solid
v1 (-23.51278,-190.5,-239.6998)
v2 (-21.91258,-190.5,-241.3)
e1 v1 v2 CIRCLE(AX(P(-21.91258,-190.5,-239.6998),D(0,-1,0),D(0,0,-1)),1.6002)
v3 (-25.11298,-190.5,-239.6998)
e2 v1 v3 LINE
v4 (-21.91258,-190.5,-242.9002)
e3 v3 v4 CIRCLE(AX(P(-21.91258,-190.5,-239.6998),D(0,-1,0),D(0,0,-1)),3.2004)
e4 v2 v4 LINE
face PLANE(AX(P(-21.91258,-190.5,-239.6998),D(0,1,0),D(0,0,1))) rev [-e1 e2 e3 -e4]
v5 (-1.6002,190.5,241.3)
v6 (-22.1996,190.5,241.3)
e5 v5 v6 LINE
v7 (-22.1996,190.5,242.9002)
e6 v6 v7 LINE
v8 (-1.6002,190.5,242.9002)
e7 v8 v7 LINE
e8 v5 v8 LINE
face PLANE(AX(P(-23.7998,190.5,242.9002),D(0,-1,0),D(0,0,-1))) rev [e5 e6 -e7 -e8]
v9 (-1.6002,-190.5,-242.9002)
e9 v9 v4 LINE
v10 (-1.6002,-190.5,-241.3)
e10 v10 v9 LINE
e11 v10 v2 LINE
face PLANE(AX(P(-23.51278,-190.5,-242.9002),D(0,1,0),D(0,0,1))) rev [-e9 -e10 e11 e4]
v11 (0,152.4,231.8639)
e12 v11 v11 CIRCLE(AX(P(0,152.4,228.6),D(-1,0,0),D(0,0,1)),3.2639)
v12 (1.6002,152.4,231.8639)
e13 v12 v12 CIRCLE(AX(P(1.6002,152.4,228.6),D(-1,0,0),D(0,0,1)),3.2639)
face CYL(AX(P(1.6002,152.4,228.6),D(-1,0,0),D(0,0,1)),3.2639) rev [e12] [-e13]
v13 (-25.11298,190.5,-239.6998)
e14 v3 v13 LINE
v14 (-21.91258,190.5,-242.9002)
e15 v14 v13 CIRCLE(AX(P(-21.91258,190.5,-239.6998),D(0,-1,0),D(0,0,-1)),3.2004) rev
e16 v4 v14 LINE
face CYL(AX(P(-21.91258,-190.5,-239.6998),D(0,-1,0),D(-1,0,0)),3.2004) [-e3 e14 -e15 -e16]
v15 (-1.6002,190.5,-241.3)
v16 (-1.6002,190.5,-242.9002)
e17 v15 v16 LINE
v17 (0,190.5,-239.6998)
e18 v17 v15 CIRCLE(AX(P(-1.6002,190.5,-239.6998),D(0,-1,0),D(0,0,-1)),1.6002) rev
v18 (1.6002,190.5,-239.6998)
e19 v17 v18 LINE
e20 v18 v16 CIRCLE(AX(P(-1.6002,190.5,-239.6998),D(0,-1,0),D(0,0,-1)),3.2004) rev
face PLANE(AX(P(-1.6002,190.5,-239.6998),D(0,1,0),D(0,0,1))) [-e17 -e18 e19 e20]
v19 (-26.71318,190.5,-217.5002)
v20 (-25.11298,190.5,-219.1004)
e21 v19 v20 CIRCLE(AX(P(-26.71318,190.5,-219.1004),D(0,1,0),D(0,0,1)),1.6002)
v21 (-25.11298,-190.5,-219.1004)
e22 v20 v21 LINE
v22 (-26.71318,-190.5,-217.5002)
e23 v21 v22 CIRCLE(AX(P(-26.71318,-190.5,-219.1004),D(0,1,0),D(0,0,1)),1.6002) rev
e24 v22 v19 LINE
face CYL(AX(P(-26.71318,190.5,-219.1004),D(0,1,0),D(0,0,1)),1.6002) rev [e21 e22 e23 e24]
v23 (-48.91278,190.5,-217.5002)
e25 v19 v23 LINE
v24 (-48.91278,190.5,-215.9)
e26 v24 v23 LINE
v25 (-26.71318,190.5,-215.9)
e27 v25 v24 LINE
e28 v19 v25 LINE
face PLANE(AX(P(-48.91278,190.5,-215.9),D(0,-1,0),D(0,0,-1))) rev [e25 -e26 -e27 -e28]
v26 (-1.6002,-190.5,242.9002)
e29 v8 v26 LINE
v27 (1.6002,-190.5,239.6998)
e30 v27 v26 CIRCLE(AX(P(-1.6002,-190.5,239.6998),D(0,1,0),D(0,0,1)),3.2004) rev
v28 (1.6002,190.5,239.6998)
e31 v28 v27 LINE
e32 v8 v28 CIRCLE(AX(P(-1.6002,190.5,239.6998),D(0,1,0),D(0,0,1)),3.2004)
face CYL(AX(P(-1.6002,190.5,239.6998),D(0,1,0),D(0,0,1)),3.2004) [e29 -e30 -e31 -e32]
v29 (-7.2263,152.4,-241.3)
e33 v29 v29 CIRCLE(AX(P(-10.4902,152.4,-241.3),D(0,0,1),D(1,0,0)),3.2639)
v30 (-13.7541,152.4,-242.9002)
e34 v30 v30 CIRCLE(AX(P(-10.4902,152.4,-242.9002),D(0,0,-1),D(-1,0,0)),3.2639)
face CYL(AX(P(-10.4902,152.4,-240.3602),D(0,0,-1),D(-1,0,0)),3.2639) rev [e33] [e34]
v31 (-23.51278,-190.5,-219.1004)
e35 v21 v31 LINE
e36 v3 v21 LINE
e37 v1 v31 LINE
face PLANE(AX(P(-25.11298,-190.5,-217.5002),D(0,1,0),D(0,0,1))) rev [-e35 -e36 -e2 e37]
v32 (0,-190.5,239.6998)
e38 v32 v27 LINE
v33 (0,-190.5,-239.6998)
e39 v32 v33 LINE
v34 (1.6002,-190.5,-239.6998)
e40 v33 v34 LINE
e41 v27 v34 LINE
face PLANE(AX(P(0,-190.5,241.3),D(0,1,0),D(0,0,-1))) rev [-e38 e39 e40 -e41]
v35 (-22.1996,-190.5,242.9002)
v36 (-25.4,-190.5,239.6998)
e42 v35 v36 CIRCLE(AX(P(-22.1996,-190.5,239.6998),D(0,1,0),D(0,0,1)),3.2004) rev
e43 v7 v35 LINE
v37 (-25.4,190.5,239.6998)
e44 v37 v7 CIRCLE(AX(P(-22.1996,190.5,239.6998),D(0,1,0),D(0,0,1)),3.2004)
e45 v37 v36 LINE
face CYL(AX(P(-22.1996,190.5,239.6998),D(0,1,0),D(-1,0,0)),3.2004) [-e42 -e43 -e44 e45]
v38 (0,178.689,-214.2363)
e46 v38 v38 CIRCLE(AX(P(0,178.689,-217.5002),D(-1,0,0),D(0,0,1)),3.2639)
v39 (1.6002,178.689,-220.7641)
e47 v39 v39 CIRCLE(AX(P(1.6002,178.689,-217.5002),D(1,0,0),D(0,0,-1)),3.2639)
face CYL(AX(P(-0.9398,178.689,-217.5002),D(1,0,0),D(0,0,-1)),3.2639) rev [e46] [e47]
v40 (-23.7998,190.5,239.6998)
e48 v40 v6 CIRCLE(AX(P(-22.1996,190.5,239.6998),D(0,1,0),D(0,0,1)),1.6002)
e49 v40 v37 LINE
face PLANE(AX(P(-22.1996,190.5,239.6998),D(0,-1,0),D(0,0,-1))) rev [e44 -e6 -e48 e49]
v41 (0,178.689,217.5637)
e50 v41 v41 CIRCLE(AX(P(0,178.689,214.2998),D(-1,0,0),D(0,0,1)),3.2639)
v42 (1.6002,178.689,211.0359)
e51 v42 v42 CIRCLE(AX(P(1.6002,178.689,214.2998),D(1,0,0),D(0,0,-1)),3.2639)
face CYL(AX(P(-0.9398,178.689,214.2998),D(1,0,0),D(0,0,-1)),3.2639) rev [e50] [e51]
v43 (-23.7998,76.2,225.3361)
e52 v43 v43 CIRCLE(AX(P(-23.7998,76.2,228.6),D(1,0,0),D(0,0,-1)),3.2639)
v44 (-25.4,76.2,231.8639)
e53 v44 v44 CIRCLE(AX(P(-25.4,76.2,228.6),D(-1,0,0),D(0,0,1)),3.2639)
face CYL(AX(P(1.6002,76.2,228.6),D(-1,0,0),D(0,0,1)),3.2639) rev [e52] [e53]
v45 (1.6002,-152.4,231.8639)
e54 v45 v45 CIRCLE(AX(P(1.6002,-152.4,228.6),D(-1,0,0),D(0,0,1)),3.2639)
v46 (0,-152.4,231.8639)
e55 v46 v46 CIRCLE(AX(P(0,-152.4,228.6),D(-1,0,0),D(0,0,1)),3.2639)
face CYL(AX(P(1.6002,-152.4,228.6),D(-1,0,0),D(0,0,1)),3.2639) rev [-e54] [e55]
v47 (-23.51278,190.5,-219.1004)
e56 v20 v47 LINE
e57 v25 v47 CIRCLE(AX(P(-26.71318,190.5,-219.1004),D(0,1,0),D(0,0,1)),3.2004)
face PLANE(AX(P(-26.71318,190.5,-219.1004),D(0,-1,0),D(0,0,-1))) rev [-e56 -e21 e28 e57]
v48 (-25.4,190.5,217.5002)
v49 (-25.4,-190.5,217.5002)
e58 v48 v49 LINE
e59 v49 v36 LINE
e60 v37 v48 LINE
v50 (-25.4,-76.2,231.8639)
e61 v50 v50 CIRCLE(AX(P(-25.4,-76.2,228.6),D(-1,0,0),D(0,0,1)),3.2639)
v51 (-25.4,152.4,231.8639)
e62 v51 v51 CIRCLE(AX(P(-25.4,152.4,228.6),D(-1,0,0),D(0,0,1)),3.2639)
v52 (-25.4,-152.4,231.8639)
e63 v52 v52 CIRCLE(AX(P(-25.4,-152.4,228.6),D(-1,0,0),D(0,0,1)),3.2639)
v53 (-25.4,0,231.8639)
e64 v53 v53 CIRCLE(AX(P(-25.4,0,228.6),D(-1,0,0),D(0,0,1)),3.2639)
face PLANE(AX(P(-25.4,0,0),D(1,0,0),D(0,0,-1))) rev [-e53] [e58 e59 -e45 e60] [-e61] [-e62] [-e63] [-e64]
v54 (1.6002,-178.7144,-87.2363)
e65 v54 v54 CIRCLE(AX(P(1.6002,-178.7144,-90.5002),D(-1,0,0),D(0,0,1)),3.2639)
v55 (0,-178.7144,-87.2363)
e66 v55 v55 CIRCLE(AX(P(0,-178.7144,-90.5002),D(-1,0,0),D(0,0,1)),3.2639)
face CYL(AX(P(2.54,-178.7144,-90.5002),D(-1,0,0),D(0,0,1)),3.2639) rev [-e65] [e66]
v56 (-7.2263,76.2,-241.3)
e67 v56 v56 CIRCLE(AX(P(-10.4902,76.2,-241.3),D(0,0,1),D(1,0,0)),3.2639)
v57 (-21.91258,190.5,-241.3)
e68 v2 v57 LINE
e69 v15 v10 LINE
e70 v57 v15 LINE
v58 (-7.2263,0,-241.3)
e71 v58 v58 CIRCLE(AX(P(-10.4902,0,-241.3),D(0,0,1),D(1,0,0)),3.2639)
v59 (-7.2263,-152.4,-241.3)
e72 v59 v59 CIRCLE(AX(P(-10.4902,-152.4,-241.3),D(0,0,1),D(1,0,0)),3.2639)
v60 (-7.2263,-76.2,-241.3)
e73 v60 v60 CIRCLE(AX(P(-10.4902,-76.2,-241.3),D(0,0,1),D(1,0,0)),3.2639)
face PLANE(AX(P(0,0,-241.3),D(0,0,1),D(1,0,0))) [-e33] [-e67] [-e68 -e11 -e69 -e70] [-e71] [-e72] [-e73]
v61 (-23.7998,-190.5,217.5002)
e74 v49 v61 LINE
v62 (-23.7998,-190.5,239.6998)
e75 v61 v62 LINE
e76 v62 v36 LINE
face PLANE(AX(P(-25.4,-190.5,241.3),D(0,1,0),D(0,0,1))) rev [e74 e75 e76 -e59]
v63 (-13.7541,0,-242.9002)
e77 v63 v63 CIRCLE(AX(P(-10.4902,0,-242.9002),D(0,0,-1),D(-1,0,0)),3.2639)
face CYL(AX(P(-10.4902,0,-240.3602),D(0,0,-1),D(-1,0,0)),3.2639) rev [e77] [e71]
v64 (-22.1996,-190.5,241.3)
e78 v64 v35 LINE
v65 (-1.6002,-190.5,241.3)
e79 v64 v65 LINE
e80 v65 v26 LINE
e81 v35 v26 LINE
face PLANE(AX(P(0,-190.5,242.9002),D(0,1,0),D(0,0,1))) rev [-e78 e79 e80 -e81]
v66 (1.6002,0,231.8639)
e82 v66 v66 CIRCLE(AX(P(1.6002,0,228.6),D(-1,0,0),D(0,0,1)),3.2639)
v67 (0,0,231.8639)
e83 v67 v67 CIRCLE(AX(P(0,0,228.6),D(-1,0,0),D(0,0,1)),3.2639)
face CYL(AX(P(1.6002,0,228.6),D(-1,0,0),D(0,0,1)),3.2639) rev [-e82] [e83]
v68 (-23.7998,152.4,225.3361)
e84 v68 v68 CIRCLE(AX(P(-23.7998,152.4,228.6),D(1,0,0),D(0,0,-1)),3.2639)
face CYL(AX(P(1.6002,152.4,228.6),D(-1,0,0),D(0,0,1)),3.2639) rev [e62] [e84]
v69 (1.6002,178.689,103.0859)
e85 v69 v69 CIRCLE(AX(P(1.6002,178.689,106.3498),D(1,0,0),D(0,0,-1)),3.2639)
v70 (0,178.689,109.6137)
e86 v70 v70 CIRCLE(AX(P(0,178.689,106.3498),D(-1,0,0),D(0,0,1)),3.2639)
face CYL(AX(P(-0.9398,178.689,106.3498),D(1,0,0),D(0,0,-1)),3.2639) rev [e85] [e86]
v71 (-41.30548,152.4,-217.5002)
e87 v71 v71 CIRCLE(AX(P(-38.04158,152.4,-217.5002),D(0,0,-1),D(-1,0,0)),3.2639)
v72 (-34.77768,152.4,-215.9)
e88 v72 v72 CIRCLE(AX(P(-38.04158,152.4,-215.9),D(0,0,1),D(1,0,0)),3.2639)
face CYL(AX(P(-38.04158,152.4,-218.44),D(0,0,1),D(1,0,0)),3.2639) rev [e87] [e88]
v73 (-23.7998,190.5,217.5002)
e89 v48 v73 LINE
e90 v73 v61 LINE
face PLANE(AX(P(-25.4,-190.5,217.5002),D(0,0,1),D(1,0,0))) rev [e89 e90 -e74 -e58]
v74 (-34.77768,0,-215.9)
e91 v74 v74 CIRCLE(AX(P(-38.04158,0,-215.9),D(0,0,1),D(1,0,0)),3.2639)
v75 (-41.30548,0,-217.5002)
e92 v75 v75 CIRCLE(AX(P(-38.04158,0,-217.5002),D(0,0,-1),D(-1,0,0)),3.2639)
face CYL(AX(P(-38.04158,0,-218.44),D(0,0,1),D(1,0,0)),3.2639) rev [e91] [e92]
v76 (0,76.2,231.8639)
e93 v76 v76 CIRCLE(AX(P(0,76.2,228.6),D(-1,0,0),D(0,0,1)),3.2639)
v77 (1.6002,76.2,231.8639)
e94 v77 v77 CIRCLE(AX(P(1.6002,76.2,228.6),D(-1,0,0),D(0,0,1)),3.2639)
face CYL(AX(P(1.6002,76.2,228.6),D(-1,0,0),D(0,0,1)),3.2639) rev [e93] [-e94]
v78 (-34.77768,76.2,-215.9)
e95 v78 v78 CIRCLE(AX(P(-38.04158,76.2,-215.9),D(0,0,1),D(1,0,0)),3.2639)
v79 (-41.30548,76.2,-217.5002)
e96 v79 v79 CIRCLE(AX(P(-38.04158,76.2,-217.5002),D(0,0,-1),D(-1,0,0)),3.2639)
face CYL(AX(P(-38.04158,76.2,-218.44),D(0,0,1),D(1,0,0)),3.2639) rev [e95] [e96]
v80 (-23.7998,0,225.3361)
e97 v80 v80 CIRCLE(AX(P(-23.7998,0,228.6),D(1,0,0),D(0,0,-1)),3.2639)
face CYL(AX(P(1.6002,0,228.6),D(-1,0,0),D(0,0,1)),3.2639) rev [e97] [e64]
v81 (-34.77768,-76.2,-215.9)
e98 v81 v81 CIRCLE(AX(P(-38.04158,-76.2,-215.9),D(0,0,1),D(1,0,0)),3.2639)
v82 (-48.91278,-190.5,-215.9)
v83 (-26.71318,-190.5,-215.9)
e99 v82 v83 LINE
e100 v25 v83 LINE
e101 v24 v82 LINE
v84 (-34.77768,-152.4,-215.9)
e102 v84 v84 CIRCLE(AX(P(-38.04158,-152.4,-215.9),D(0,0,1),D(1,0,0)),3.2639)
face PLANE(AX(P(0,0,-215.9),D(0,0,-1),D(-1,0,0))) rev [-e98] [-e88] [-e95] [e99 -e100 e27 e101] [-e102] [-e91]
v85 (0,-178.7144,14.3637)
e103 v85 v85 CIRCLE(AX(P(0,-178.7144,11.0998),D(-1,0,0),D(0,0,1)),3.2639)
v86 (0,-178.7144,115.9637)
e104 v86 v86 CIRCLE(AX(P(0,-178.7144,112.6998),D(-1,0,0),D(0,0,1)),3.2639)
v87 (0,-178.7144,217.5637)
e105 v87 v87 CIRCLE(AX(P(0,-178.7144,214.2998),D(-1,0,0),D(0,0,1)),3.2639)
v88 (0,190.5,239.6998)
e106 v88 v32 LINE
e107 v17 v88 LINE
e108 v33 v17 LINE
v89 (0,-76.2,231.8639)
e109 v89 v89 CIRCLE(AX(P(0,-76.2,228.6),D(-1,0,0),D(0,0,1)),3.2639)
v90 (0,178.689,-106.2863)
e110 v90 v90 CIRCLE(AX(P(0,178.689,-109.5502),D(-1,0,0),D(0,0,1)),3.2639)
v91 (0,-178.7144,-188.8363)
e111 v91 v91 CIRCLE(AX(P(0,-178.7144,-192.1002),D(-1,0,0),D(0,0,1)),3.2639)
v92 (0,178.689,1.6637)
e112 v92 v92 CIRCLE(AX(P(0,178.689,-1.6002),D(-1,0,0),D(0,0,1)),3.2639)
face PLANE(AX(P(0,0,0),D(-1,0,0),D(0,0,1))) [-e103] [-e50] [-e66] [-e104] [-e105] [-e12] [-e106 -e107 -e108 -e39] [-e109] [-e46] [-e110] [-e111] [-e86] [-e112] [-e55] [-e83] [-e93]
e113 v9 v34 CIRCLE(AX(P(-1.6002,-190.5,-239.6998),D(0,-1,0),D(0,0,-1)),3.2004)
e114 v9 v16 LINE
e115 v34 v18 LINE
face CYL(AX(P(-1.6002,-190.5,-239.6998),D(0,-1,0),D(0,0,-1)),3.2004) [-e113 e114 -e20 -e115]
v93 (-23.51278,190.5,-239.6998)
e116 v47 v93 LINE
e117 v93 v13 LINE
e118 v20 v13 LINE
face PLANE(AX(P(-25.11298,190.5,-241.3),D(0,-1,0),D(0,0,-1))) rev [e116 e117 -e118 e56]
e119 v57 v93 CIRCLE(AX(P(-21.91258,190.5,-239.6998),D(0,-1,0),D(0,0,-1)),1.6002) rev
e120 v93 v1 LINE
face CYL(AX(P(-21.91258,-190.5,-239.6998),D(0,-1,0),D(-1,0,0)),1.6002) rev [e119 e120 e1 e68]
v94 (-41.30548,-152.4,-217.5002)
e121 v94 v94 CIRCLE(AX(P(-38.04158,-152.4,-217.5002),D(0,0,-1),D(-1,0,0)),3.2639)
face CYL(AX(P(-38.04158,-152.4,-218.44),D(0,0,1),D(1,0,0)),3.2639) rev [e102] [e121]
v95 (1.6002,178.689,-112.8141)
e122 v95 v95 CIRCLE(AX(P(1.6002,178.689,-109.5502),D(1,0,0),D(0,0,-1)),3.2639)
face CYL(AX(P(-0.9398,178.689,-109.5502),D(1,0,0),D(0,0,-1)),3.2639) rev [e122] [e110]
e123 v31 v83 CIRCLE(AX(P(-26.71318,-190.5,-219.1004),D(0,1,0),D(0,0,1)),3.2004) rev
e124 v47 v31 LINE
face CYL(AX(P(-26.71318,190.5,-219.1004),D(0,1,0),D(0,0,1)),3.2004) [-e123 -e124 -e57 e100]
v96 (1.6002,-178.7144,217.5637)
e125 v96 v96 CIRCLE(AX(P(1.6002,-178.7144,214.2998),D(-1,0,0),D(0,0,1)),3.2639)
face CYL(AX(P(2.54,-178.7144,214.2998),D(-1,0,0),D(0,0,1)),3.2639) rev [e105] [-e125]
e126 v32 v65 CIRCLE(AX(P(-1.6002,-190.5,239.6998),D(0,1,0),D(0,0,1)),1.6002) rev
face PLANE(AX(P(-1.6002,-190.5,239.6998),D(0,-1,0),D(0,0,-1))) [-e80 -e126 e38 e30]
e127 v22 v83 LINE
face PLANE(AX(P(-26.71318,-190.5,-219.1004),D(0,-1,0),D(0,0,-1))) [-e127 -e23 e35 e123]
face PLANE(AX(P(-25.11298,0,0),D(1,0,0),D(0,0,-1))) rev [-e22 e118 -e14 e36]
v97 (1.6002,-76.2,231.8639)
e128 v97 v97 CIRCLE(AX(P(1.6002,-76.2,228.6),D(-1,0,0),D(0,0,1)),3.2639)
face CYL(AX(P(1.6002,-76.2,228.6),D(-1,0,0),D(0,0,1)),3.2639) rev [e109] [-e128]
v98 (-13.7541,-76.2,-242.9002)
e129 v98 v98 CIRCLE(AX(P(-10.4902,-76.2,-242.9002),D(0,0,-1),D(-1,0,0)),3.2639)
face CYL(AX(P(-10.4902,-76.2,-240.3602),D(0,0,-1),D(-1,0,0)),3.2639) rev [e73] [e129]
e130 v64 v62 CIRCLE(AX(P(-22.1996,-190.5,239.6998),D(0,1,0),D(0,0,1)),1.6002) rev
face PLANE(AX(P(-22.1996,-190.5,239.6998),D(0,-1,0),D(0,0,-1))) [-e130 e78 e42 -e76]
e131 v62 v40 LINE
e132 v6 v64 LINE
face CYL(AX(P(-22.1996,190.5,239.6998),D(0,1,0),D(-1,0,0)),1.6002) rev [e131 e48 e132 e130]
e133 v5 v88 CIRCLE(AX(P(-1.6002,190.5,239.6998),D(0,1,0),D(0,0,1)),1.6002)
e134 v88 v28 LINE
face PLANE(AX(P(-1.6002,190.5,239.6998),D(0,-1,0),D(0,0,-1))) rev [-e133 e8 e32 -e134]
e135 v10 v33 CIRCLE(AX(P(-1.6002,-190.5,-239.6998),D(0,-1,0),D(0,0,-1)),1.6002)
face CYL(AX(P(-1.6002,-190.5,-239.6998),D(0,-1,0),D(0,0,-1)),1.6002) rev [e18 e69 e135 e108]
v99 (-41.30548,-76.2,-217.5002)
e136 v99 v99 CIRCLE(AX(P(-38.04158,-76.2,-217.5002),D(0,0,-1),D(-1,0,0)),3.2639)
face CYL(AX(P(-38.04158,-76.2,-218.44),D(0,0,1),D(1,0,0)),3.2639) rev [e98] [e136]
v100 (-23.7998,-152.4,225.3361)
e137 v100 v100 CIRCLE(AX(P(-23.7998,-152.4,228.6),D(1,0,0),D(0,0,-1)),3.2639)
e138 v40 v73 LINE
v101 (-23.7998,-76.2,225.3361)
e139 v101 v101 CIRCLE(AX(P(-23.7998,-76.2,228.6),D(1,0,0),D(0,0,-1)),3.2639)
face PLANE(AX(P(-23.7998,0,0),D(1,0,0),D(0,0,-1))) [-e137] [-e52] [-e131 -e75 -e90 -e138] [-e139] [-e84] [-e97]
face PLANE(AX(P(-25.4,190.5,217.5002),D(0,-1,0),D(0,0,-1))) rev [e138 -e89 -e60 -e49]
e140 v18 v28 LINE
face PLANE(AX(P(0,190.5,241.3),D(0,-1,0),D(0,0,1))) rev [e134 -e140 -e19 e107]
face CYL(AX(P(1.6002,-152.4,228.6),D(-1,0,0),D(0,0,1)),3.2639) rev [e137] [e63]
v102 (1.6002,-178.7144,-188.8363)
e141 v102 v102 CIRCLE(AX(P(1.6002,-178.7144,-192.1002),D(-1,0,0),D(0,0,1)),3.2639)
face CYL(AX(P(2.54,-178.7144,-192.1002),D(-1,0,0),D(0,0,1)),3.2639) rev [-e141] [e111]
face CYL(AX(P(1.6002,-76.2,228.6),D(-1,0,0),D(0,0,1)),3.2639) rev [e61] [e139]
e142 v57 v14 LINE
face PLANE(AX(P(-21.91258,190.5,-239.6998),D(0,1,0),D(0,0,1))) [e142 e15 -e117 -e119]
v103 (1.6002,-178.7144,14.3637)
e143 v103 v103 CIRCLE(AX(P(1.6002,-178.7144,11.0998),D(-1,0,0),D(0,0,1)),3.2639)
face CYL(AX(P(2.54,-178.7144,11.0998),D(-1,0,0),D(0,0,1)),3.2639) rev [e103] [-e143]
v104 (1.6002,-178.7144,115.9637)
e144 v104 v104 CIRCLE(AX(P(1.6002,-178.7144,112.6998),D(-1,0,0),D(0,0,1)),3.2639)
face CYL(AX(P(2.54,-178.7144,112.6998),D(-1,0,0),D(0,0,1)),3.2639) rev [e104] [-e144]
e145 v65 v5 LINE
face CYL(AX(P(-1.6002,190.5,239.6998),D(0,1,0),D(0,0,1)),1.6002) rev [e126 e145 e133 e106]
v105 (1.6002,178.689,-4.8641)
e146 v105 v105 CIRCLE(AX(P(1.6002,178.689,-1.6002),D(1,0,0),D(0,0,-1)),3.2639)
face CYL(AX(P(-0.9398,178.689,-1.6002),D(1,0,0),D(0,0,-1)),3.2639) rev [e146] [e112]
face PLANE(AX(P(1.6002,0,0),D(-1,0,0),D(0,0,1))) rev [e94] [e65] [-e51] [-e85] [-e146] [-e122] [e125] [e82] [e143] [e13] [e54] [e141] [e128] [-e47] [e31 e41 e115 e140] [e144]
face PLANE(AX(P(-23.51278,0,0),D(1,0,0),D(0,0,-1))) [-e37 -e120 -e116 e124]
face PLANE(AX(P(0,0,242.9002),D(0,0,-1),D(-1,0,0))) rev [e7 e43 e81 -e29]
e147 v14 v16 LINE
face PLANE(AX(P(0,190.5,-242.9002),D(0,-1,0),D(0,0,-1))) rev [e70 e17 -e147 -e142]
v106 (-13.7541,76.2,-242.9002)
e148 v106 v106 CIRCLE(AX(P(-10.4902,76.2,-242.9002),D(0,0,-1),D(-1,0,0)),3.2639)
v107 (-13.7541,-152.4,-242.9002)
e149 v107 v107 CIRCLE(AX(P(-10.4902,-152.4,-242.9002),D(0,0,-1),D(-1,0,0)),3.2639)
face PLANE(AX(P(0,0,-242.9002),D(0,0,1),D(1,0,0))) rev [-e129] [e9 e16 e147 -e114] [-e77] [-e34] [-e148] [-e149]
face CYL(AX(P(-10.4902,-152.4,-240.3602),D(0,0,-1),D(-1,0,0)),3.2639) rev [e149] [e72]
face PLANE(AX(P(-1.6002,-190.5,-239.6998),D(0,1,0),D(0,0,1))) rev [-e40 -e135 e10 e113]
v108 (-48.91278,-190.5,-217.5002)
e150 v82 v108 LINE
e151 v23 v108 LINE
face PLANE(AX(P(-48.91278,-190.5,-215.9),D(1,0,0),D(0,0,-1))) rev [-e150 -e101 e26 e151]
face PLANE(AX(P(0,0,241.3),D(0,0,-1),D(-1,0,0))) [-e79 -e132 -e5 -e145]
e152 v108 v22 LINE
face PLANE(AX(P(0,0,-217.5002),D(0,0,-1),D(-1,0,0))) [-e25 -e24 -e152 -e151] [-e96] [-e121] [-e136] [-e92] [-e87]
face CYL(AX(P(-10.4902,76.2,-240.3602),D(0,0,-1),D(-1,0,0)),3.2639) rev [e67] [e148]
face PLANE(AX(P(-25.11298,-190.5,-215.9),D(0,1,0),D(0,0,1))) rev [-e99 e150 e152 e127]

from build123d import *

# Parameters (mm, degrees)
SKETCH1_W                    = 482.6
SKETCH1_H                    = 381
BOSS_EXTRUDE1_DEPTH          = 1.6002
EDGE_FLANGE1_STRIP_W         = 9.6012
EDGE_FLANGE1_STRIP_H         = 1.6002
EDGE_FLANGE1_STRIP_CUT_DEPTH = 381
EDGE_FLANGE1_DEPTH           = 381
EDGE_FLANGE2_STRIP_W         = 9.6012
EDGE_FLANGE2_STRIP_H         = 1.6002
EDGE_FLANGE2_STRIP_CUT_DEPTH = 381
EDGE_FLANGE2_DEPTH           = 381
EDGE_FLANGE3_STRIP_W         = 9.6012
EDGE_FLANGE3_STRIP_H         = 1.6002
EDGE_FLANGE3_STRIP_CUT_DEPTH = 381
EDGE_FLANGE3_DEPTH           = 381
EDGE_FLANGE4_STRIP_W         = 9.6012
EDGE_FLANGE4_STRIP_H         = 1.6002
EDGE_FLANGE4_STRIP_CUT_DEPTH = 381
EDGE_FLANGE4_DEPTH           = 381
EDGE_FLANGE5_STRIP_W         = 9.6012
EDGE_FLANGE5_STRIP_H         = 1.6002
EDGE_FLANGE5_STRIP_CUT_DEPTH = 381
EDGE_FLANGE5_DEPTH           = 381
SKETCH24_R                   = 3.2639
CUT_EXTRUDE2_DEPTH           = 2.54
SKETCH25_R                   = 3.2639
CUT_EXTRUDE3_DEPTH           = 310.870566463
SKETCH26_R                   = 3.2639
CUT_EXTRUDE4_DEPTH           = 2.54
SKETCH27_R                   = 3.2639
CUT_EXTRUDE6_DEPTH           = 2.54
SKETCH29_R                   = 3.2639
CUT_EXTRUDE7_DEPTH           = 2.54


# Sheet-metal steps are written as plain solids
with BuildPart() as part:
    # Sketch1 → Boss-Extrude1 (new body)
    with BuildSketch(Plane(origin=(0, 0, 0), x_dir=(0, 0, -1), z_dir=(1, 0, 0))):
        Rectangle(SKETCH1_W, SKETCH1_H)
    extrude(amount=BOSS_EXTRUDE1_DEPTH)

    # Edge-Flange1 strip (across the edge) → Edge-Flange1 strip cut (cut)
    with BuildSketch(Plane(origin=(0, 190.5, -241.3), x_dir=(0, 0, 1), z_dir=(0, -1, 0))):
        with Locations((-3.2004, -0.8001)):
            Rectangle(EDGE_FLANGE1_STRIP_W, EDGE_FLANGE1_STRIP_H)
    extrude(amount=EDGE_FLANGE1_STRIP_CUT_DEPTH, mode=Mode.SUBTRACT)

    # Edge-Flange1 section (across the edge) → Edge-Flange1 (add)
    with BuildSketch(Plane(origin=(0, 190.5, -241.3), x_dir=(0, 0, 1), z_dir=(0, -1, 0))):
        with BuildLine():
            Line((-1.6002, 1.6002), (-1.6002, 23.51278))
            Line((-1.6002, 23.51278), (0, 23.51278))
            Line((0, 23.51278), (0, 1.6002))
            ThreePointArc((0, 1.6002), (0.468687729, 0.468687729), (1.6002, 0))
            Line((1.6002, 0), (1.6002, -1.6002))
            ThreePointArc((1.6002, -1.6002), (-0.662824543, -0.662824543), (-1.6002, 1.6002))
        make_face()
    extrude(amount=EDGE_FLANGE1_DEPTH)

    # Edge-Flange2 strip (across the edge) → Edge-Flange2 strip cut (cut)
    with BuildSketch(Plane(origin=(-23.51278, 190.5, -241.3), x_dir=(1, 0, 0), z_dir=(0, -1, 0))):
        with Locations((-3.2004, -0.8001)):
            Rectangle(EDGE_FLANGE2_STRIP_W, EDGE_FLANGE2_STRIP_H)
    extrude(amount=EDGE_FLANGE2_STRIP_CUT_DEPTH, mode=Mode.SUBTRACT)

    # Edge-Flange2 section (across the edge) → Edge-Flange2 (add)
    with BuildSketch(Plane(origin=(-23.51278, 190.5, -241.3), x_dir=(1, 0, 0), z_dir=(0, -1, 0))):
        with BuildLine():
            Line((-1.6002, 1.6002), (-1.6002, 23.7998))
            Line((-1.6002, 23.7998), (0, 23.7998))
            Line((0, 23.7998), (0, 1.6002))
            ThreePointArc((0, 1.6002), (0.468687729, 0.468687729), (1.6002, 0))
            Line((1.6002, 0), (1.6002, -1.6002))
            ThreePointArc((1.6002, -1.6002), (-0.662824543, -0.662824543), (-1.6002, 1.6002))
        make_face()
    extrude(amount=EDGE_FLANGE2_DEPTH)

    # Edge-Flange3 strip (across the edge) → Edge-Flange3 strip cut (cut)
    with BuildSketch(Plane(origin=(-25.11298, -190.5, -217.5002), x_dir=(0, 0, -1), z_dir=(0, 1, 0))):
        with Locations((-3.2004, -0.8001)):
            Rectangle(EDGE_FLANGE3_STRIP_W, EDGE_FLANGE3_STRIP_H)
    extrude(amount=EDGE_FLANGE3_STRIP_CUT_DEPTH, mode=Mode.SUBTRACT)

    # Edge-Flange3 section (across the edge) → Edge-Flange3 (add)
    with BuildSketch(Plane(origin=(-25.11298, -190.5, -217.5002), x_dir=(0, 0, -1), z_dir=(0, 1, 0))):
        with BuildLine():
            Line((-1.6002, 1.6002), (-1.6002, 23.7998))
            Line((-1.6002, 23.7998), (0, 23.7998))
            Line((0, 23.7998), (0, 1.6002))
            ThreePointArc((0, 1.6002), (0.468687729, 0.468687729), (1.6002, 0))
            Line((1.6002, 0), (1.6002, -1.6002))
            ThreePointArc((1.6002, -1.6002), (-0.662824543, -0.662824543), (-1.6002, 1.6002))
        make_face()
    extrude(amount=EDGE_FLANGE3_DEPTH)

    # Edge-Flange4 strip (across the edge) → Edge-Flange4 strip cut (cut)
    with BuildSketch(Plane(origin=(0, -190.5, 241.3), x_dir=(0, 0, -1), z_dir=(0, 1, 0))):
        with Locations((-3.2004, -0.8001)):
            Rectangle(EDGE_FLANGE4_STRIP_W, EDGE_FLANGE4_STRIP_H)
    extrude(amount=EDGE_FLANGE4_STRIP_CUT_DEPTH, mode=Mode.SUBTRACT)

    # Edge-Flange4 section (across the edge) → Edge-Flange4 (add)
    with BuildSketch(Plane(origin=(0, -190.5, 241.3), x_dir=(0, 0, -1), z_dir=(0, 1, 0))):
        with BuildLine():
            Line((-1.6002, 1.6002), (-1.6002, 23.7998))
            Line((-1.6002, 23.7998), (0, 23.7998))
            Line((0, 23.7998), (0, 1.6002))
            ThreePointArc((0, 1.6002), (0.468687729, 0.468687729), (1.6002, 0))
            Line((1.6002, 0), (1.6002, -1.6002))
            ThreePointArc((1.6002, -1.6002), (-0.662824543, -0.662824543), (-1.6002, 1.6002))
        make_face()
    extrude(amount=EDGE_FLANGE4_DEPTH)

    # Edge-Flange5 strip (across the edge) → Edge-Flange5 strip cut (cut)
    with BuildSketch(Plane(origin=(-23.7998, -190.5, 241.3), x_dir=(1, 0, 0), z_dir=(0, 1, 0))):
        with Locations((-3.2004, -0.8001)):
            Rectangle(EDGE_FLANGE5_STRIP_W, EDGE_FLANGE5_STRIP_H)
    extrude(amount=EDGE_FLANGE5_STRIP_CUT_DEPTH, mode=Mode.SUBTRACT)

    # Edge-Flange5 section (across the edge) → Edge-Flange5 (add)
    with BuildSketch(Plane(origin=(-23.7998, -190.5, 241.3), x_dir=(1, 0, 0), z_dir=(0, 1, 0))):
        with BuildLine():
            Line((-1.6002, 1.6002), (-1.6002, 23.7998))
            Line((-1.6002, 23.7998), (0, 23.7998))
            Line((0, 23.7998), (0, 1.6002))
            ThreePointArc((0, 1.6002), (0.468687729, 0.468687729), (1.6002, 0))
            Line((1.6002, 0), (1.6002, -1.6002))
            ThreePointArc((1.6002, -1.6002), (-0.662824543, -0.662824543), (-1.6002, 1.6002))
        make_face()
    extrude(amount=EDGE_FLANGE5_DEPTH)

    # Sketch24 → Cut-Extrude2 (cut)
    with BuildSketch(Plane.XY.offset(-215.9)):
        with Locations((-38.04158, 152.4)):
            Circle(SKETCH24_R)
        with Locations((-38.04158, 76.2)):
            Circle(SKETCH24_R)
        with Locations((-38.04158, 0)):
            Circle(SKETCH24_R)
        with Locations((-38.04158, -76.2)):
            Circle(SKETCH24_R)
        with Locations((-38.04158, -152.4)):
            Circle(SKETCH24_R)
    extrude(amount=-CUT_EXTRUDE2_DEPTH, mode=Mode.SUBTRACT)

    # Sketch25 → Cut-Extrude3 (cut, through all)
    with BuildSketch(Plane.ZY.offset(25.4)):
        with Locations((228.6, 152.4)):
            Circle(SKETCH25_R)
        with Locations((228.6, 76.2)):
            Circle(SKETCH25_R)
        with Locations((228.6, -76.2)):
            Circle(SKETCH25_R)
        with Locations((228.6, -152.4)):
            Circle(SKETCH25_R)
        with Locations((228.6, 0)):
            Circle(SKETCH25_R)
    extrude(amount=-CUT_EXTRUDE3_DEPTH, mode=Mode.SUBTRACT)

    # Sketch26 → Cut-Extrude4 (cut)
    with BuildSketch(Plane(origin=(0, 0, -242.9002), x_dir=(-1, 0, 0), z_dir=(0, 0, -1))):
        with Locations((10.4902, 152.4)):
            Circle(SKETCH26_R)
        with Locations((10.4902, 76.2)):
            Circle(SKETCH26_R)
        with Locations((10.4902, 0)):
            Circle(SKETCH26_R)
        with Locations((10.4902, -76.2)):
            Circle(SKETCH26_R)
        with Locations((10.4902, -152.4)):
            Circle(SKETCH26_R)
    extrude(amount=-CUT_EXTRUDE4_DEPTH, mode=Mode.SUBTRACT)

    # Sketch27 → Cut-Extrude6 (cut)
    with BuildSketch(Plane(origin=(1.6002, 0, 0), x_dir=(0, 0, -1), z_dir=(1, 0, 0))):
        with Locations((-214.2998, 178.689)):
            Circle(SKETCH27_R)
        with Locations((-106.3498, 178.689)):
            Circle(SKETCH27_R)
        with Locations((1.6002, 178.689)):
            Circle(SKETCH27_R)
        with Locations((109.5502, 178.689)):
            Circle(SKETCH27_R)
        with Locations((217.5002, 178.689)):
            Circle(SKETCH27_R)
    extrude(amount=-CUT_EXTRUDE6_DEPTH, mode=Mode.SUBTRACT)

    # Sketch29 → Cut-Extrude7 (cut)
    with BuildSketch(Plane.ZY):
        with Locations((-192.1002, -178.7144)):
            Circle(SKETCH29_R)
        with Locations((-90.5002, -178.7144)):
            Circle(SKETCH29_R)
        with Locations((11.0998, -178.7144)):
            Circle(SKETCH29_R)
        with Locations((112.6998, -178.7144)):
            Circle(SKETCH29_R)
        with Locations((214.2998, -178.7144)):
            Circle(SKETCH29_R)
    extrude(amount=-CUT_EXTRUDE7_DEPTH, mode=Mode.SUBTRACT)


solid = part.part
